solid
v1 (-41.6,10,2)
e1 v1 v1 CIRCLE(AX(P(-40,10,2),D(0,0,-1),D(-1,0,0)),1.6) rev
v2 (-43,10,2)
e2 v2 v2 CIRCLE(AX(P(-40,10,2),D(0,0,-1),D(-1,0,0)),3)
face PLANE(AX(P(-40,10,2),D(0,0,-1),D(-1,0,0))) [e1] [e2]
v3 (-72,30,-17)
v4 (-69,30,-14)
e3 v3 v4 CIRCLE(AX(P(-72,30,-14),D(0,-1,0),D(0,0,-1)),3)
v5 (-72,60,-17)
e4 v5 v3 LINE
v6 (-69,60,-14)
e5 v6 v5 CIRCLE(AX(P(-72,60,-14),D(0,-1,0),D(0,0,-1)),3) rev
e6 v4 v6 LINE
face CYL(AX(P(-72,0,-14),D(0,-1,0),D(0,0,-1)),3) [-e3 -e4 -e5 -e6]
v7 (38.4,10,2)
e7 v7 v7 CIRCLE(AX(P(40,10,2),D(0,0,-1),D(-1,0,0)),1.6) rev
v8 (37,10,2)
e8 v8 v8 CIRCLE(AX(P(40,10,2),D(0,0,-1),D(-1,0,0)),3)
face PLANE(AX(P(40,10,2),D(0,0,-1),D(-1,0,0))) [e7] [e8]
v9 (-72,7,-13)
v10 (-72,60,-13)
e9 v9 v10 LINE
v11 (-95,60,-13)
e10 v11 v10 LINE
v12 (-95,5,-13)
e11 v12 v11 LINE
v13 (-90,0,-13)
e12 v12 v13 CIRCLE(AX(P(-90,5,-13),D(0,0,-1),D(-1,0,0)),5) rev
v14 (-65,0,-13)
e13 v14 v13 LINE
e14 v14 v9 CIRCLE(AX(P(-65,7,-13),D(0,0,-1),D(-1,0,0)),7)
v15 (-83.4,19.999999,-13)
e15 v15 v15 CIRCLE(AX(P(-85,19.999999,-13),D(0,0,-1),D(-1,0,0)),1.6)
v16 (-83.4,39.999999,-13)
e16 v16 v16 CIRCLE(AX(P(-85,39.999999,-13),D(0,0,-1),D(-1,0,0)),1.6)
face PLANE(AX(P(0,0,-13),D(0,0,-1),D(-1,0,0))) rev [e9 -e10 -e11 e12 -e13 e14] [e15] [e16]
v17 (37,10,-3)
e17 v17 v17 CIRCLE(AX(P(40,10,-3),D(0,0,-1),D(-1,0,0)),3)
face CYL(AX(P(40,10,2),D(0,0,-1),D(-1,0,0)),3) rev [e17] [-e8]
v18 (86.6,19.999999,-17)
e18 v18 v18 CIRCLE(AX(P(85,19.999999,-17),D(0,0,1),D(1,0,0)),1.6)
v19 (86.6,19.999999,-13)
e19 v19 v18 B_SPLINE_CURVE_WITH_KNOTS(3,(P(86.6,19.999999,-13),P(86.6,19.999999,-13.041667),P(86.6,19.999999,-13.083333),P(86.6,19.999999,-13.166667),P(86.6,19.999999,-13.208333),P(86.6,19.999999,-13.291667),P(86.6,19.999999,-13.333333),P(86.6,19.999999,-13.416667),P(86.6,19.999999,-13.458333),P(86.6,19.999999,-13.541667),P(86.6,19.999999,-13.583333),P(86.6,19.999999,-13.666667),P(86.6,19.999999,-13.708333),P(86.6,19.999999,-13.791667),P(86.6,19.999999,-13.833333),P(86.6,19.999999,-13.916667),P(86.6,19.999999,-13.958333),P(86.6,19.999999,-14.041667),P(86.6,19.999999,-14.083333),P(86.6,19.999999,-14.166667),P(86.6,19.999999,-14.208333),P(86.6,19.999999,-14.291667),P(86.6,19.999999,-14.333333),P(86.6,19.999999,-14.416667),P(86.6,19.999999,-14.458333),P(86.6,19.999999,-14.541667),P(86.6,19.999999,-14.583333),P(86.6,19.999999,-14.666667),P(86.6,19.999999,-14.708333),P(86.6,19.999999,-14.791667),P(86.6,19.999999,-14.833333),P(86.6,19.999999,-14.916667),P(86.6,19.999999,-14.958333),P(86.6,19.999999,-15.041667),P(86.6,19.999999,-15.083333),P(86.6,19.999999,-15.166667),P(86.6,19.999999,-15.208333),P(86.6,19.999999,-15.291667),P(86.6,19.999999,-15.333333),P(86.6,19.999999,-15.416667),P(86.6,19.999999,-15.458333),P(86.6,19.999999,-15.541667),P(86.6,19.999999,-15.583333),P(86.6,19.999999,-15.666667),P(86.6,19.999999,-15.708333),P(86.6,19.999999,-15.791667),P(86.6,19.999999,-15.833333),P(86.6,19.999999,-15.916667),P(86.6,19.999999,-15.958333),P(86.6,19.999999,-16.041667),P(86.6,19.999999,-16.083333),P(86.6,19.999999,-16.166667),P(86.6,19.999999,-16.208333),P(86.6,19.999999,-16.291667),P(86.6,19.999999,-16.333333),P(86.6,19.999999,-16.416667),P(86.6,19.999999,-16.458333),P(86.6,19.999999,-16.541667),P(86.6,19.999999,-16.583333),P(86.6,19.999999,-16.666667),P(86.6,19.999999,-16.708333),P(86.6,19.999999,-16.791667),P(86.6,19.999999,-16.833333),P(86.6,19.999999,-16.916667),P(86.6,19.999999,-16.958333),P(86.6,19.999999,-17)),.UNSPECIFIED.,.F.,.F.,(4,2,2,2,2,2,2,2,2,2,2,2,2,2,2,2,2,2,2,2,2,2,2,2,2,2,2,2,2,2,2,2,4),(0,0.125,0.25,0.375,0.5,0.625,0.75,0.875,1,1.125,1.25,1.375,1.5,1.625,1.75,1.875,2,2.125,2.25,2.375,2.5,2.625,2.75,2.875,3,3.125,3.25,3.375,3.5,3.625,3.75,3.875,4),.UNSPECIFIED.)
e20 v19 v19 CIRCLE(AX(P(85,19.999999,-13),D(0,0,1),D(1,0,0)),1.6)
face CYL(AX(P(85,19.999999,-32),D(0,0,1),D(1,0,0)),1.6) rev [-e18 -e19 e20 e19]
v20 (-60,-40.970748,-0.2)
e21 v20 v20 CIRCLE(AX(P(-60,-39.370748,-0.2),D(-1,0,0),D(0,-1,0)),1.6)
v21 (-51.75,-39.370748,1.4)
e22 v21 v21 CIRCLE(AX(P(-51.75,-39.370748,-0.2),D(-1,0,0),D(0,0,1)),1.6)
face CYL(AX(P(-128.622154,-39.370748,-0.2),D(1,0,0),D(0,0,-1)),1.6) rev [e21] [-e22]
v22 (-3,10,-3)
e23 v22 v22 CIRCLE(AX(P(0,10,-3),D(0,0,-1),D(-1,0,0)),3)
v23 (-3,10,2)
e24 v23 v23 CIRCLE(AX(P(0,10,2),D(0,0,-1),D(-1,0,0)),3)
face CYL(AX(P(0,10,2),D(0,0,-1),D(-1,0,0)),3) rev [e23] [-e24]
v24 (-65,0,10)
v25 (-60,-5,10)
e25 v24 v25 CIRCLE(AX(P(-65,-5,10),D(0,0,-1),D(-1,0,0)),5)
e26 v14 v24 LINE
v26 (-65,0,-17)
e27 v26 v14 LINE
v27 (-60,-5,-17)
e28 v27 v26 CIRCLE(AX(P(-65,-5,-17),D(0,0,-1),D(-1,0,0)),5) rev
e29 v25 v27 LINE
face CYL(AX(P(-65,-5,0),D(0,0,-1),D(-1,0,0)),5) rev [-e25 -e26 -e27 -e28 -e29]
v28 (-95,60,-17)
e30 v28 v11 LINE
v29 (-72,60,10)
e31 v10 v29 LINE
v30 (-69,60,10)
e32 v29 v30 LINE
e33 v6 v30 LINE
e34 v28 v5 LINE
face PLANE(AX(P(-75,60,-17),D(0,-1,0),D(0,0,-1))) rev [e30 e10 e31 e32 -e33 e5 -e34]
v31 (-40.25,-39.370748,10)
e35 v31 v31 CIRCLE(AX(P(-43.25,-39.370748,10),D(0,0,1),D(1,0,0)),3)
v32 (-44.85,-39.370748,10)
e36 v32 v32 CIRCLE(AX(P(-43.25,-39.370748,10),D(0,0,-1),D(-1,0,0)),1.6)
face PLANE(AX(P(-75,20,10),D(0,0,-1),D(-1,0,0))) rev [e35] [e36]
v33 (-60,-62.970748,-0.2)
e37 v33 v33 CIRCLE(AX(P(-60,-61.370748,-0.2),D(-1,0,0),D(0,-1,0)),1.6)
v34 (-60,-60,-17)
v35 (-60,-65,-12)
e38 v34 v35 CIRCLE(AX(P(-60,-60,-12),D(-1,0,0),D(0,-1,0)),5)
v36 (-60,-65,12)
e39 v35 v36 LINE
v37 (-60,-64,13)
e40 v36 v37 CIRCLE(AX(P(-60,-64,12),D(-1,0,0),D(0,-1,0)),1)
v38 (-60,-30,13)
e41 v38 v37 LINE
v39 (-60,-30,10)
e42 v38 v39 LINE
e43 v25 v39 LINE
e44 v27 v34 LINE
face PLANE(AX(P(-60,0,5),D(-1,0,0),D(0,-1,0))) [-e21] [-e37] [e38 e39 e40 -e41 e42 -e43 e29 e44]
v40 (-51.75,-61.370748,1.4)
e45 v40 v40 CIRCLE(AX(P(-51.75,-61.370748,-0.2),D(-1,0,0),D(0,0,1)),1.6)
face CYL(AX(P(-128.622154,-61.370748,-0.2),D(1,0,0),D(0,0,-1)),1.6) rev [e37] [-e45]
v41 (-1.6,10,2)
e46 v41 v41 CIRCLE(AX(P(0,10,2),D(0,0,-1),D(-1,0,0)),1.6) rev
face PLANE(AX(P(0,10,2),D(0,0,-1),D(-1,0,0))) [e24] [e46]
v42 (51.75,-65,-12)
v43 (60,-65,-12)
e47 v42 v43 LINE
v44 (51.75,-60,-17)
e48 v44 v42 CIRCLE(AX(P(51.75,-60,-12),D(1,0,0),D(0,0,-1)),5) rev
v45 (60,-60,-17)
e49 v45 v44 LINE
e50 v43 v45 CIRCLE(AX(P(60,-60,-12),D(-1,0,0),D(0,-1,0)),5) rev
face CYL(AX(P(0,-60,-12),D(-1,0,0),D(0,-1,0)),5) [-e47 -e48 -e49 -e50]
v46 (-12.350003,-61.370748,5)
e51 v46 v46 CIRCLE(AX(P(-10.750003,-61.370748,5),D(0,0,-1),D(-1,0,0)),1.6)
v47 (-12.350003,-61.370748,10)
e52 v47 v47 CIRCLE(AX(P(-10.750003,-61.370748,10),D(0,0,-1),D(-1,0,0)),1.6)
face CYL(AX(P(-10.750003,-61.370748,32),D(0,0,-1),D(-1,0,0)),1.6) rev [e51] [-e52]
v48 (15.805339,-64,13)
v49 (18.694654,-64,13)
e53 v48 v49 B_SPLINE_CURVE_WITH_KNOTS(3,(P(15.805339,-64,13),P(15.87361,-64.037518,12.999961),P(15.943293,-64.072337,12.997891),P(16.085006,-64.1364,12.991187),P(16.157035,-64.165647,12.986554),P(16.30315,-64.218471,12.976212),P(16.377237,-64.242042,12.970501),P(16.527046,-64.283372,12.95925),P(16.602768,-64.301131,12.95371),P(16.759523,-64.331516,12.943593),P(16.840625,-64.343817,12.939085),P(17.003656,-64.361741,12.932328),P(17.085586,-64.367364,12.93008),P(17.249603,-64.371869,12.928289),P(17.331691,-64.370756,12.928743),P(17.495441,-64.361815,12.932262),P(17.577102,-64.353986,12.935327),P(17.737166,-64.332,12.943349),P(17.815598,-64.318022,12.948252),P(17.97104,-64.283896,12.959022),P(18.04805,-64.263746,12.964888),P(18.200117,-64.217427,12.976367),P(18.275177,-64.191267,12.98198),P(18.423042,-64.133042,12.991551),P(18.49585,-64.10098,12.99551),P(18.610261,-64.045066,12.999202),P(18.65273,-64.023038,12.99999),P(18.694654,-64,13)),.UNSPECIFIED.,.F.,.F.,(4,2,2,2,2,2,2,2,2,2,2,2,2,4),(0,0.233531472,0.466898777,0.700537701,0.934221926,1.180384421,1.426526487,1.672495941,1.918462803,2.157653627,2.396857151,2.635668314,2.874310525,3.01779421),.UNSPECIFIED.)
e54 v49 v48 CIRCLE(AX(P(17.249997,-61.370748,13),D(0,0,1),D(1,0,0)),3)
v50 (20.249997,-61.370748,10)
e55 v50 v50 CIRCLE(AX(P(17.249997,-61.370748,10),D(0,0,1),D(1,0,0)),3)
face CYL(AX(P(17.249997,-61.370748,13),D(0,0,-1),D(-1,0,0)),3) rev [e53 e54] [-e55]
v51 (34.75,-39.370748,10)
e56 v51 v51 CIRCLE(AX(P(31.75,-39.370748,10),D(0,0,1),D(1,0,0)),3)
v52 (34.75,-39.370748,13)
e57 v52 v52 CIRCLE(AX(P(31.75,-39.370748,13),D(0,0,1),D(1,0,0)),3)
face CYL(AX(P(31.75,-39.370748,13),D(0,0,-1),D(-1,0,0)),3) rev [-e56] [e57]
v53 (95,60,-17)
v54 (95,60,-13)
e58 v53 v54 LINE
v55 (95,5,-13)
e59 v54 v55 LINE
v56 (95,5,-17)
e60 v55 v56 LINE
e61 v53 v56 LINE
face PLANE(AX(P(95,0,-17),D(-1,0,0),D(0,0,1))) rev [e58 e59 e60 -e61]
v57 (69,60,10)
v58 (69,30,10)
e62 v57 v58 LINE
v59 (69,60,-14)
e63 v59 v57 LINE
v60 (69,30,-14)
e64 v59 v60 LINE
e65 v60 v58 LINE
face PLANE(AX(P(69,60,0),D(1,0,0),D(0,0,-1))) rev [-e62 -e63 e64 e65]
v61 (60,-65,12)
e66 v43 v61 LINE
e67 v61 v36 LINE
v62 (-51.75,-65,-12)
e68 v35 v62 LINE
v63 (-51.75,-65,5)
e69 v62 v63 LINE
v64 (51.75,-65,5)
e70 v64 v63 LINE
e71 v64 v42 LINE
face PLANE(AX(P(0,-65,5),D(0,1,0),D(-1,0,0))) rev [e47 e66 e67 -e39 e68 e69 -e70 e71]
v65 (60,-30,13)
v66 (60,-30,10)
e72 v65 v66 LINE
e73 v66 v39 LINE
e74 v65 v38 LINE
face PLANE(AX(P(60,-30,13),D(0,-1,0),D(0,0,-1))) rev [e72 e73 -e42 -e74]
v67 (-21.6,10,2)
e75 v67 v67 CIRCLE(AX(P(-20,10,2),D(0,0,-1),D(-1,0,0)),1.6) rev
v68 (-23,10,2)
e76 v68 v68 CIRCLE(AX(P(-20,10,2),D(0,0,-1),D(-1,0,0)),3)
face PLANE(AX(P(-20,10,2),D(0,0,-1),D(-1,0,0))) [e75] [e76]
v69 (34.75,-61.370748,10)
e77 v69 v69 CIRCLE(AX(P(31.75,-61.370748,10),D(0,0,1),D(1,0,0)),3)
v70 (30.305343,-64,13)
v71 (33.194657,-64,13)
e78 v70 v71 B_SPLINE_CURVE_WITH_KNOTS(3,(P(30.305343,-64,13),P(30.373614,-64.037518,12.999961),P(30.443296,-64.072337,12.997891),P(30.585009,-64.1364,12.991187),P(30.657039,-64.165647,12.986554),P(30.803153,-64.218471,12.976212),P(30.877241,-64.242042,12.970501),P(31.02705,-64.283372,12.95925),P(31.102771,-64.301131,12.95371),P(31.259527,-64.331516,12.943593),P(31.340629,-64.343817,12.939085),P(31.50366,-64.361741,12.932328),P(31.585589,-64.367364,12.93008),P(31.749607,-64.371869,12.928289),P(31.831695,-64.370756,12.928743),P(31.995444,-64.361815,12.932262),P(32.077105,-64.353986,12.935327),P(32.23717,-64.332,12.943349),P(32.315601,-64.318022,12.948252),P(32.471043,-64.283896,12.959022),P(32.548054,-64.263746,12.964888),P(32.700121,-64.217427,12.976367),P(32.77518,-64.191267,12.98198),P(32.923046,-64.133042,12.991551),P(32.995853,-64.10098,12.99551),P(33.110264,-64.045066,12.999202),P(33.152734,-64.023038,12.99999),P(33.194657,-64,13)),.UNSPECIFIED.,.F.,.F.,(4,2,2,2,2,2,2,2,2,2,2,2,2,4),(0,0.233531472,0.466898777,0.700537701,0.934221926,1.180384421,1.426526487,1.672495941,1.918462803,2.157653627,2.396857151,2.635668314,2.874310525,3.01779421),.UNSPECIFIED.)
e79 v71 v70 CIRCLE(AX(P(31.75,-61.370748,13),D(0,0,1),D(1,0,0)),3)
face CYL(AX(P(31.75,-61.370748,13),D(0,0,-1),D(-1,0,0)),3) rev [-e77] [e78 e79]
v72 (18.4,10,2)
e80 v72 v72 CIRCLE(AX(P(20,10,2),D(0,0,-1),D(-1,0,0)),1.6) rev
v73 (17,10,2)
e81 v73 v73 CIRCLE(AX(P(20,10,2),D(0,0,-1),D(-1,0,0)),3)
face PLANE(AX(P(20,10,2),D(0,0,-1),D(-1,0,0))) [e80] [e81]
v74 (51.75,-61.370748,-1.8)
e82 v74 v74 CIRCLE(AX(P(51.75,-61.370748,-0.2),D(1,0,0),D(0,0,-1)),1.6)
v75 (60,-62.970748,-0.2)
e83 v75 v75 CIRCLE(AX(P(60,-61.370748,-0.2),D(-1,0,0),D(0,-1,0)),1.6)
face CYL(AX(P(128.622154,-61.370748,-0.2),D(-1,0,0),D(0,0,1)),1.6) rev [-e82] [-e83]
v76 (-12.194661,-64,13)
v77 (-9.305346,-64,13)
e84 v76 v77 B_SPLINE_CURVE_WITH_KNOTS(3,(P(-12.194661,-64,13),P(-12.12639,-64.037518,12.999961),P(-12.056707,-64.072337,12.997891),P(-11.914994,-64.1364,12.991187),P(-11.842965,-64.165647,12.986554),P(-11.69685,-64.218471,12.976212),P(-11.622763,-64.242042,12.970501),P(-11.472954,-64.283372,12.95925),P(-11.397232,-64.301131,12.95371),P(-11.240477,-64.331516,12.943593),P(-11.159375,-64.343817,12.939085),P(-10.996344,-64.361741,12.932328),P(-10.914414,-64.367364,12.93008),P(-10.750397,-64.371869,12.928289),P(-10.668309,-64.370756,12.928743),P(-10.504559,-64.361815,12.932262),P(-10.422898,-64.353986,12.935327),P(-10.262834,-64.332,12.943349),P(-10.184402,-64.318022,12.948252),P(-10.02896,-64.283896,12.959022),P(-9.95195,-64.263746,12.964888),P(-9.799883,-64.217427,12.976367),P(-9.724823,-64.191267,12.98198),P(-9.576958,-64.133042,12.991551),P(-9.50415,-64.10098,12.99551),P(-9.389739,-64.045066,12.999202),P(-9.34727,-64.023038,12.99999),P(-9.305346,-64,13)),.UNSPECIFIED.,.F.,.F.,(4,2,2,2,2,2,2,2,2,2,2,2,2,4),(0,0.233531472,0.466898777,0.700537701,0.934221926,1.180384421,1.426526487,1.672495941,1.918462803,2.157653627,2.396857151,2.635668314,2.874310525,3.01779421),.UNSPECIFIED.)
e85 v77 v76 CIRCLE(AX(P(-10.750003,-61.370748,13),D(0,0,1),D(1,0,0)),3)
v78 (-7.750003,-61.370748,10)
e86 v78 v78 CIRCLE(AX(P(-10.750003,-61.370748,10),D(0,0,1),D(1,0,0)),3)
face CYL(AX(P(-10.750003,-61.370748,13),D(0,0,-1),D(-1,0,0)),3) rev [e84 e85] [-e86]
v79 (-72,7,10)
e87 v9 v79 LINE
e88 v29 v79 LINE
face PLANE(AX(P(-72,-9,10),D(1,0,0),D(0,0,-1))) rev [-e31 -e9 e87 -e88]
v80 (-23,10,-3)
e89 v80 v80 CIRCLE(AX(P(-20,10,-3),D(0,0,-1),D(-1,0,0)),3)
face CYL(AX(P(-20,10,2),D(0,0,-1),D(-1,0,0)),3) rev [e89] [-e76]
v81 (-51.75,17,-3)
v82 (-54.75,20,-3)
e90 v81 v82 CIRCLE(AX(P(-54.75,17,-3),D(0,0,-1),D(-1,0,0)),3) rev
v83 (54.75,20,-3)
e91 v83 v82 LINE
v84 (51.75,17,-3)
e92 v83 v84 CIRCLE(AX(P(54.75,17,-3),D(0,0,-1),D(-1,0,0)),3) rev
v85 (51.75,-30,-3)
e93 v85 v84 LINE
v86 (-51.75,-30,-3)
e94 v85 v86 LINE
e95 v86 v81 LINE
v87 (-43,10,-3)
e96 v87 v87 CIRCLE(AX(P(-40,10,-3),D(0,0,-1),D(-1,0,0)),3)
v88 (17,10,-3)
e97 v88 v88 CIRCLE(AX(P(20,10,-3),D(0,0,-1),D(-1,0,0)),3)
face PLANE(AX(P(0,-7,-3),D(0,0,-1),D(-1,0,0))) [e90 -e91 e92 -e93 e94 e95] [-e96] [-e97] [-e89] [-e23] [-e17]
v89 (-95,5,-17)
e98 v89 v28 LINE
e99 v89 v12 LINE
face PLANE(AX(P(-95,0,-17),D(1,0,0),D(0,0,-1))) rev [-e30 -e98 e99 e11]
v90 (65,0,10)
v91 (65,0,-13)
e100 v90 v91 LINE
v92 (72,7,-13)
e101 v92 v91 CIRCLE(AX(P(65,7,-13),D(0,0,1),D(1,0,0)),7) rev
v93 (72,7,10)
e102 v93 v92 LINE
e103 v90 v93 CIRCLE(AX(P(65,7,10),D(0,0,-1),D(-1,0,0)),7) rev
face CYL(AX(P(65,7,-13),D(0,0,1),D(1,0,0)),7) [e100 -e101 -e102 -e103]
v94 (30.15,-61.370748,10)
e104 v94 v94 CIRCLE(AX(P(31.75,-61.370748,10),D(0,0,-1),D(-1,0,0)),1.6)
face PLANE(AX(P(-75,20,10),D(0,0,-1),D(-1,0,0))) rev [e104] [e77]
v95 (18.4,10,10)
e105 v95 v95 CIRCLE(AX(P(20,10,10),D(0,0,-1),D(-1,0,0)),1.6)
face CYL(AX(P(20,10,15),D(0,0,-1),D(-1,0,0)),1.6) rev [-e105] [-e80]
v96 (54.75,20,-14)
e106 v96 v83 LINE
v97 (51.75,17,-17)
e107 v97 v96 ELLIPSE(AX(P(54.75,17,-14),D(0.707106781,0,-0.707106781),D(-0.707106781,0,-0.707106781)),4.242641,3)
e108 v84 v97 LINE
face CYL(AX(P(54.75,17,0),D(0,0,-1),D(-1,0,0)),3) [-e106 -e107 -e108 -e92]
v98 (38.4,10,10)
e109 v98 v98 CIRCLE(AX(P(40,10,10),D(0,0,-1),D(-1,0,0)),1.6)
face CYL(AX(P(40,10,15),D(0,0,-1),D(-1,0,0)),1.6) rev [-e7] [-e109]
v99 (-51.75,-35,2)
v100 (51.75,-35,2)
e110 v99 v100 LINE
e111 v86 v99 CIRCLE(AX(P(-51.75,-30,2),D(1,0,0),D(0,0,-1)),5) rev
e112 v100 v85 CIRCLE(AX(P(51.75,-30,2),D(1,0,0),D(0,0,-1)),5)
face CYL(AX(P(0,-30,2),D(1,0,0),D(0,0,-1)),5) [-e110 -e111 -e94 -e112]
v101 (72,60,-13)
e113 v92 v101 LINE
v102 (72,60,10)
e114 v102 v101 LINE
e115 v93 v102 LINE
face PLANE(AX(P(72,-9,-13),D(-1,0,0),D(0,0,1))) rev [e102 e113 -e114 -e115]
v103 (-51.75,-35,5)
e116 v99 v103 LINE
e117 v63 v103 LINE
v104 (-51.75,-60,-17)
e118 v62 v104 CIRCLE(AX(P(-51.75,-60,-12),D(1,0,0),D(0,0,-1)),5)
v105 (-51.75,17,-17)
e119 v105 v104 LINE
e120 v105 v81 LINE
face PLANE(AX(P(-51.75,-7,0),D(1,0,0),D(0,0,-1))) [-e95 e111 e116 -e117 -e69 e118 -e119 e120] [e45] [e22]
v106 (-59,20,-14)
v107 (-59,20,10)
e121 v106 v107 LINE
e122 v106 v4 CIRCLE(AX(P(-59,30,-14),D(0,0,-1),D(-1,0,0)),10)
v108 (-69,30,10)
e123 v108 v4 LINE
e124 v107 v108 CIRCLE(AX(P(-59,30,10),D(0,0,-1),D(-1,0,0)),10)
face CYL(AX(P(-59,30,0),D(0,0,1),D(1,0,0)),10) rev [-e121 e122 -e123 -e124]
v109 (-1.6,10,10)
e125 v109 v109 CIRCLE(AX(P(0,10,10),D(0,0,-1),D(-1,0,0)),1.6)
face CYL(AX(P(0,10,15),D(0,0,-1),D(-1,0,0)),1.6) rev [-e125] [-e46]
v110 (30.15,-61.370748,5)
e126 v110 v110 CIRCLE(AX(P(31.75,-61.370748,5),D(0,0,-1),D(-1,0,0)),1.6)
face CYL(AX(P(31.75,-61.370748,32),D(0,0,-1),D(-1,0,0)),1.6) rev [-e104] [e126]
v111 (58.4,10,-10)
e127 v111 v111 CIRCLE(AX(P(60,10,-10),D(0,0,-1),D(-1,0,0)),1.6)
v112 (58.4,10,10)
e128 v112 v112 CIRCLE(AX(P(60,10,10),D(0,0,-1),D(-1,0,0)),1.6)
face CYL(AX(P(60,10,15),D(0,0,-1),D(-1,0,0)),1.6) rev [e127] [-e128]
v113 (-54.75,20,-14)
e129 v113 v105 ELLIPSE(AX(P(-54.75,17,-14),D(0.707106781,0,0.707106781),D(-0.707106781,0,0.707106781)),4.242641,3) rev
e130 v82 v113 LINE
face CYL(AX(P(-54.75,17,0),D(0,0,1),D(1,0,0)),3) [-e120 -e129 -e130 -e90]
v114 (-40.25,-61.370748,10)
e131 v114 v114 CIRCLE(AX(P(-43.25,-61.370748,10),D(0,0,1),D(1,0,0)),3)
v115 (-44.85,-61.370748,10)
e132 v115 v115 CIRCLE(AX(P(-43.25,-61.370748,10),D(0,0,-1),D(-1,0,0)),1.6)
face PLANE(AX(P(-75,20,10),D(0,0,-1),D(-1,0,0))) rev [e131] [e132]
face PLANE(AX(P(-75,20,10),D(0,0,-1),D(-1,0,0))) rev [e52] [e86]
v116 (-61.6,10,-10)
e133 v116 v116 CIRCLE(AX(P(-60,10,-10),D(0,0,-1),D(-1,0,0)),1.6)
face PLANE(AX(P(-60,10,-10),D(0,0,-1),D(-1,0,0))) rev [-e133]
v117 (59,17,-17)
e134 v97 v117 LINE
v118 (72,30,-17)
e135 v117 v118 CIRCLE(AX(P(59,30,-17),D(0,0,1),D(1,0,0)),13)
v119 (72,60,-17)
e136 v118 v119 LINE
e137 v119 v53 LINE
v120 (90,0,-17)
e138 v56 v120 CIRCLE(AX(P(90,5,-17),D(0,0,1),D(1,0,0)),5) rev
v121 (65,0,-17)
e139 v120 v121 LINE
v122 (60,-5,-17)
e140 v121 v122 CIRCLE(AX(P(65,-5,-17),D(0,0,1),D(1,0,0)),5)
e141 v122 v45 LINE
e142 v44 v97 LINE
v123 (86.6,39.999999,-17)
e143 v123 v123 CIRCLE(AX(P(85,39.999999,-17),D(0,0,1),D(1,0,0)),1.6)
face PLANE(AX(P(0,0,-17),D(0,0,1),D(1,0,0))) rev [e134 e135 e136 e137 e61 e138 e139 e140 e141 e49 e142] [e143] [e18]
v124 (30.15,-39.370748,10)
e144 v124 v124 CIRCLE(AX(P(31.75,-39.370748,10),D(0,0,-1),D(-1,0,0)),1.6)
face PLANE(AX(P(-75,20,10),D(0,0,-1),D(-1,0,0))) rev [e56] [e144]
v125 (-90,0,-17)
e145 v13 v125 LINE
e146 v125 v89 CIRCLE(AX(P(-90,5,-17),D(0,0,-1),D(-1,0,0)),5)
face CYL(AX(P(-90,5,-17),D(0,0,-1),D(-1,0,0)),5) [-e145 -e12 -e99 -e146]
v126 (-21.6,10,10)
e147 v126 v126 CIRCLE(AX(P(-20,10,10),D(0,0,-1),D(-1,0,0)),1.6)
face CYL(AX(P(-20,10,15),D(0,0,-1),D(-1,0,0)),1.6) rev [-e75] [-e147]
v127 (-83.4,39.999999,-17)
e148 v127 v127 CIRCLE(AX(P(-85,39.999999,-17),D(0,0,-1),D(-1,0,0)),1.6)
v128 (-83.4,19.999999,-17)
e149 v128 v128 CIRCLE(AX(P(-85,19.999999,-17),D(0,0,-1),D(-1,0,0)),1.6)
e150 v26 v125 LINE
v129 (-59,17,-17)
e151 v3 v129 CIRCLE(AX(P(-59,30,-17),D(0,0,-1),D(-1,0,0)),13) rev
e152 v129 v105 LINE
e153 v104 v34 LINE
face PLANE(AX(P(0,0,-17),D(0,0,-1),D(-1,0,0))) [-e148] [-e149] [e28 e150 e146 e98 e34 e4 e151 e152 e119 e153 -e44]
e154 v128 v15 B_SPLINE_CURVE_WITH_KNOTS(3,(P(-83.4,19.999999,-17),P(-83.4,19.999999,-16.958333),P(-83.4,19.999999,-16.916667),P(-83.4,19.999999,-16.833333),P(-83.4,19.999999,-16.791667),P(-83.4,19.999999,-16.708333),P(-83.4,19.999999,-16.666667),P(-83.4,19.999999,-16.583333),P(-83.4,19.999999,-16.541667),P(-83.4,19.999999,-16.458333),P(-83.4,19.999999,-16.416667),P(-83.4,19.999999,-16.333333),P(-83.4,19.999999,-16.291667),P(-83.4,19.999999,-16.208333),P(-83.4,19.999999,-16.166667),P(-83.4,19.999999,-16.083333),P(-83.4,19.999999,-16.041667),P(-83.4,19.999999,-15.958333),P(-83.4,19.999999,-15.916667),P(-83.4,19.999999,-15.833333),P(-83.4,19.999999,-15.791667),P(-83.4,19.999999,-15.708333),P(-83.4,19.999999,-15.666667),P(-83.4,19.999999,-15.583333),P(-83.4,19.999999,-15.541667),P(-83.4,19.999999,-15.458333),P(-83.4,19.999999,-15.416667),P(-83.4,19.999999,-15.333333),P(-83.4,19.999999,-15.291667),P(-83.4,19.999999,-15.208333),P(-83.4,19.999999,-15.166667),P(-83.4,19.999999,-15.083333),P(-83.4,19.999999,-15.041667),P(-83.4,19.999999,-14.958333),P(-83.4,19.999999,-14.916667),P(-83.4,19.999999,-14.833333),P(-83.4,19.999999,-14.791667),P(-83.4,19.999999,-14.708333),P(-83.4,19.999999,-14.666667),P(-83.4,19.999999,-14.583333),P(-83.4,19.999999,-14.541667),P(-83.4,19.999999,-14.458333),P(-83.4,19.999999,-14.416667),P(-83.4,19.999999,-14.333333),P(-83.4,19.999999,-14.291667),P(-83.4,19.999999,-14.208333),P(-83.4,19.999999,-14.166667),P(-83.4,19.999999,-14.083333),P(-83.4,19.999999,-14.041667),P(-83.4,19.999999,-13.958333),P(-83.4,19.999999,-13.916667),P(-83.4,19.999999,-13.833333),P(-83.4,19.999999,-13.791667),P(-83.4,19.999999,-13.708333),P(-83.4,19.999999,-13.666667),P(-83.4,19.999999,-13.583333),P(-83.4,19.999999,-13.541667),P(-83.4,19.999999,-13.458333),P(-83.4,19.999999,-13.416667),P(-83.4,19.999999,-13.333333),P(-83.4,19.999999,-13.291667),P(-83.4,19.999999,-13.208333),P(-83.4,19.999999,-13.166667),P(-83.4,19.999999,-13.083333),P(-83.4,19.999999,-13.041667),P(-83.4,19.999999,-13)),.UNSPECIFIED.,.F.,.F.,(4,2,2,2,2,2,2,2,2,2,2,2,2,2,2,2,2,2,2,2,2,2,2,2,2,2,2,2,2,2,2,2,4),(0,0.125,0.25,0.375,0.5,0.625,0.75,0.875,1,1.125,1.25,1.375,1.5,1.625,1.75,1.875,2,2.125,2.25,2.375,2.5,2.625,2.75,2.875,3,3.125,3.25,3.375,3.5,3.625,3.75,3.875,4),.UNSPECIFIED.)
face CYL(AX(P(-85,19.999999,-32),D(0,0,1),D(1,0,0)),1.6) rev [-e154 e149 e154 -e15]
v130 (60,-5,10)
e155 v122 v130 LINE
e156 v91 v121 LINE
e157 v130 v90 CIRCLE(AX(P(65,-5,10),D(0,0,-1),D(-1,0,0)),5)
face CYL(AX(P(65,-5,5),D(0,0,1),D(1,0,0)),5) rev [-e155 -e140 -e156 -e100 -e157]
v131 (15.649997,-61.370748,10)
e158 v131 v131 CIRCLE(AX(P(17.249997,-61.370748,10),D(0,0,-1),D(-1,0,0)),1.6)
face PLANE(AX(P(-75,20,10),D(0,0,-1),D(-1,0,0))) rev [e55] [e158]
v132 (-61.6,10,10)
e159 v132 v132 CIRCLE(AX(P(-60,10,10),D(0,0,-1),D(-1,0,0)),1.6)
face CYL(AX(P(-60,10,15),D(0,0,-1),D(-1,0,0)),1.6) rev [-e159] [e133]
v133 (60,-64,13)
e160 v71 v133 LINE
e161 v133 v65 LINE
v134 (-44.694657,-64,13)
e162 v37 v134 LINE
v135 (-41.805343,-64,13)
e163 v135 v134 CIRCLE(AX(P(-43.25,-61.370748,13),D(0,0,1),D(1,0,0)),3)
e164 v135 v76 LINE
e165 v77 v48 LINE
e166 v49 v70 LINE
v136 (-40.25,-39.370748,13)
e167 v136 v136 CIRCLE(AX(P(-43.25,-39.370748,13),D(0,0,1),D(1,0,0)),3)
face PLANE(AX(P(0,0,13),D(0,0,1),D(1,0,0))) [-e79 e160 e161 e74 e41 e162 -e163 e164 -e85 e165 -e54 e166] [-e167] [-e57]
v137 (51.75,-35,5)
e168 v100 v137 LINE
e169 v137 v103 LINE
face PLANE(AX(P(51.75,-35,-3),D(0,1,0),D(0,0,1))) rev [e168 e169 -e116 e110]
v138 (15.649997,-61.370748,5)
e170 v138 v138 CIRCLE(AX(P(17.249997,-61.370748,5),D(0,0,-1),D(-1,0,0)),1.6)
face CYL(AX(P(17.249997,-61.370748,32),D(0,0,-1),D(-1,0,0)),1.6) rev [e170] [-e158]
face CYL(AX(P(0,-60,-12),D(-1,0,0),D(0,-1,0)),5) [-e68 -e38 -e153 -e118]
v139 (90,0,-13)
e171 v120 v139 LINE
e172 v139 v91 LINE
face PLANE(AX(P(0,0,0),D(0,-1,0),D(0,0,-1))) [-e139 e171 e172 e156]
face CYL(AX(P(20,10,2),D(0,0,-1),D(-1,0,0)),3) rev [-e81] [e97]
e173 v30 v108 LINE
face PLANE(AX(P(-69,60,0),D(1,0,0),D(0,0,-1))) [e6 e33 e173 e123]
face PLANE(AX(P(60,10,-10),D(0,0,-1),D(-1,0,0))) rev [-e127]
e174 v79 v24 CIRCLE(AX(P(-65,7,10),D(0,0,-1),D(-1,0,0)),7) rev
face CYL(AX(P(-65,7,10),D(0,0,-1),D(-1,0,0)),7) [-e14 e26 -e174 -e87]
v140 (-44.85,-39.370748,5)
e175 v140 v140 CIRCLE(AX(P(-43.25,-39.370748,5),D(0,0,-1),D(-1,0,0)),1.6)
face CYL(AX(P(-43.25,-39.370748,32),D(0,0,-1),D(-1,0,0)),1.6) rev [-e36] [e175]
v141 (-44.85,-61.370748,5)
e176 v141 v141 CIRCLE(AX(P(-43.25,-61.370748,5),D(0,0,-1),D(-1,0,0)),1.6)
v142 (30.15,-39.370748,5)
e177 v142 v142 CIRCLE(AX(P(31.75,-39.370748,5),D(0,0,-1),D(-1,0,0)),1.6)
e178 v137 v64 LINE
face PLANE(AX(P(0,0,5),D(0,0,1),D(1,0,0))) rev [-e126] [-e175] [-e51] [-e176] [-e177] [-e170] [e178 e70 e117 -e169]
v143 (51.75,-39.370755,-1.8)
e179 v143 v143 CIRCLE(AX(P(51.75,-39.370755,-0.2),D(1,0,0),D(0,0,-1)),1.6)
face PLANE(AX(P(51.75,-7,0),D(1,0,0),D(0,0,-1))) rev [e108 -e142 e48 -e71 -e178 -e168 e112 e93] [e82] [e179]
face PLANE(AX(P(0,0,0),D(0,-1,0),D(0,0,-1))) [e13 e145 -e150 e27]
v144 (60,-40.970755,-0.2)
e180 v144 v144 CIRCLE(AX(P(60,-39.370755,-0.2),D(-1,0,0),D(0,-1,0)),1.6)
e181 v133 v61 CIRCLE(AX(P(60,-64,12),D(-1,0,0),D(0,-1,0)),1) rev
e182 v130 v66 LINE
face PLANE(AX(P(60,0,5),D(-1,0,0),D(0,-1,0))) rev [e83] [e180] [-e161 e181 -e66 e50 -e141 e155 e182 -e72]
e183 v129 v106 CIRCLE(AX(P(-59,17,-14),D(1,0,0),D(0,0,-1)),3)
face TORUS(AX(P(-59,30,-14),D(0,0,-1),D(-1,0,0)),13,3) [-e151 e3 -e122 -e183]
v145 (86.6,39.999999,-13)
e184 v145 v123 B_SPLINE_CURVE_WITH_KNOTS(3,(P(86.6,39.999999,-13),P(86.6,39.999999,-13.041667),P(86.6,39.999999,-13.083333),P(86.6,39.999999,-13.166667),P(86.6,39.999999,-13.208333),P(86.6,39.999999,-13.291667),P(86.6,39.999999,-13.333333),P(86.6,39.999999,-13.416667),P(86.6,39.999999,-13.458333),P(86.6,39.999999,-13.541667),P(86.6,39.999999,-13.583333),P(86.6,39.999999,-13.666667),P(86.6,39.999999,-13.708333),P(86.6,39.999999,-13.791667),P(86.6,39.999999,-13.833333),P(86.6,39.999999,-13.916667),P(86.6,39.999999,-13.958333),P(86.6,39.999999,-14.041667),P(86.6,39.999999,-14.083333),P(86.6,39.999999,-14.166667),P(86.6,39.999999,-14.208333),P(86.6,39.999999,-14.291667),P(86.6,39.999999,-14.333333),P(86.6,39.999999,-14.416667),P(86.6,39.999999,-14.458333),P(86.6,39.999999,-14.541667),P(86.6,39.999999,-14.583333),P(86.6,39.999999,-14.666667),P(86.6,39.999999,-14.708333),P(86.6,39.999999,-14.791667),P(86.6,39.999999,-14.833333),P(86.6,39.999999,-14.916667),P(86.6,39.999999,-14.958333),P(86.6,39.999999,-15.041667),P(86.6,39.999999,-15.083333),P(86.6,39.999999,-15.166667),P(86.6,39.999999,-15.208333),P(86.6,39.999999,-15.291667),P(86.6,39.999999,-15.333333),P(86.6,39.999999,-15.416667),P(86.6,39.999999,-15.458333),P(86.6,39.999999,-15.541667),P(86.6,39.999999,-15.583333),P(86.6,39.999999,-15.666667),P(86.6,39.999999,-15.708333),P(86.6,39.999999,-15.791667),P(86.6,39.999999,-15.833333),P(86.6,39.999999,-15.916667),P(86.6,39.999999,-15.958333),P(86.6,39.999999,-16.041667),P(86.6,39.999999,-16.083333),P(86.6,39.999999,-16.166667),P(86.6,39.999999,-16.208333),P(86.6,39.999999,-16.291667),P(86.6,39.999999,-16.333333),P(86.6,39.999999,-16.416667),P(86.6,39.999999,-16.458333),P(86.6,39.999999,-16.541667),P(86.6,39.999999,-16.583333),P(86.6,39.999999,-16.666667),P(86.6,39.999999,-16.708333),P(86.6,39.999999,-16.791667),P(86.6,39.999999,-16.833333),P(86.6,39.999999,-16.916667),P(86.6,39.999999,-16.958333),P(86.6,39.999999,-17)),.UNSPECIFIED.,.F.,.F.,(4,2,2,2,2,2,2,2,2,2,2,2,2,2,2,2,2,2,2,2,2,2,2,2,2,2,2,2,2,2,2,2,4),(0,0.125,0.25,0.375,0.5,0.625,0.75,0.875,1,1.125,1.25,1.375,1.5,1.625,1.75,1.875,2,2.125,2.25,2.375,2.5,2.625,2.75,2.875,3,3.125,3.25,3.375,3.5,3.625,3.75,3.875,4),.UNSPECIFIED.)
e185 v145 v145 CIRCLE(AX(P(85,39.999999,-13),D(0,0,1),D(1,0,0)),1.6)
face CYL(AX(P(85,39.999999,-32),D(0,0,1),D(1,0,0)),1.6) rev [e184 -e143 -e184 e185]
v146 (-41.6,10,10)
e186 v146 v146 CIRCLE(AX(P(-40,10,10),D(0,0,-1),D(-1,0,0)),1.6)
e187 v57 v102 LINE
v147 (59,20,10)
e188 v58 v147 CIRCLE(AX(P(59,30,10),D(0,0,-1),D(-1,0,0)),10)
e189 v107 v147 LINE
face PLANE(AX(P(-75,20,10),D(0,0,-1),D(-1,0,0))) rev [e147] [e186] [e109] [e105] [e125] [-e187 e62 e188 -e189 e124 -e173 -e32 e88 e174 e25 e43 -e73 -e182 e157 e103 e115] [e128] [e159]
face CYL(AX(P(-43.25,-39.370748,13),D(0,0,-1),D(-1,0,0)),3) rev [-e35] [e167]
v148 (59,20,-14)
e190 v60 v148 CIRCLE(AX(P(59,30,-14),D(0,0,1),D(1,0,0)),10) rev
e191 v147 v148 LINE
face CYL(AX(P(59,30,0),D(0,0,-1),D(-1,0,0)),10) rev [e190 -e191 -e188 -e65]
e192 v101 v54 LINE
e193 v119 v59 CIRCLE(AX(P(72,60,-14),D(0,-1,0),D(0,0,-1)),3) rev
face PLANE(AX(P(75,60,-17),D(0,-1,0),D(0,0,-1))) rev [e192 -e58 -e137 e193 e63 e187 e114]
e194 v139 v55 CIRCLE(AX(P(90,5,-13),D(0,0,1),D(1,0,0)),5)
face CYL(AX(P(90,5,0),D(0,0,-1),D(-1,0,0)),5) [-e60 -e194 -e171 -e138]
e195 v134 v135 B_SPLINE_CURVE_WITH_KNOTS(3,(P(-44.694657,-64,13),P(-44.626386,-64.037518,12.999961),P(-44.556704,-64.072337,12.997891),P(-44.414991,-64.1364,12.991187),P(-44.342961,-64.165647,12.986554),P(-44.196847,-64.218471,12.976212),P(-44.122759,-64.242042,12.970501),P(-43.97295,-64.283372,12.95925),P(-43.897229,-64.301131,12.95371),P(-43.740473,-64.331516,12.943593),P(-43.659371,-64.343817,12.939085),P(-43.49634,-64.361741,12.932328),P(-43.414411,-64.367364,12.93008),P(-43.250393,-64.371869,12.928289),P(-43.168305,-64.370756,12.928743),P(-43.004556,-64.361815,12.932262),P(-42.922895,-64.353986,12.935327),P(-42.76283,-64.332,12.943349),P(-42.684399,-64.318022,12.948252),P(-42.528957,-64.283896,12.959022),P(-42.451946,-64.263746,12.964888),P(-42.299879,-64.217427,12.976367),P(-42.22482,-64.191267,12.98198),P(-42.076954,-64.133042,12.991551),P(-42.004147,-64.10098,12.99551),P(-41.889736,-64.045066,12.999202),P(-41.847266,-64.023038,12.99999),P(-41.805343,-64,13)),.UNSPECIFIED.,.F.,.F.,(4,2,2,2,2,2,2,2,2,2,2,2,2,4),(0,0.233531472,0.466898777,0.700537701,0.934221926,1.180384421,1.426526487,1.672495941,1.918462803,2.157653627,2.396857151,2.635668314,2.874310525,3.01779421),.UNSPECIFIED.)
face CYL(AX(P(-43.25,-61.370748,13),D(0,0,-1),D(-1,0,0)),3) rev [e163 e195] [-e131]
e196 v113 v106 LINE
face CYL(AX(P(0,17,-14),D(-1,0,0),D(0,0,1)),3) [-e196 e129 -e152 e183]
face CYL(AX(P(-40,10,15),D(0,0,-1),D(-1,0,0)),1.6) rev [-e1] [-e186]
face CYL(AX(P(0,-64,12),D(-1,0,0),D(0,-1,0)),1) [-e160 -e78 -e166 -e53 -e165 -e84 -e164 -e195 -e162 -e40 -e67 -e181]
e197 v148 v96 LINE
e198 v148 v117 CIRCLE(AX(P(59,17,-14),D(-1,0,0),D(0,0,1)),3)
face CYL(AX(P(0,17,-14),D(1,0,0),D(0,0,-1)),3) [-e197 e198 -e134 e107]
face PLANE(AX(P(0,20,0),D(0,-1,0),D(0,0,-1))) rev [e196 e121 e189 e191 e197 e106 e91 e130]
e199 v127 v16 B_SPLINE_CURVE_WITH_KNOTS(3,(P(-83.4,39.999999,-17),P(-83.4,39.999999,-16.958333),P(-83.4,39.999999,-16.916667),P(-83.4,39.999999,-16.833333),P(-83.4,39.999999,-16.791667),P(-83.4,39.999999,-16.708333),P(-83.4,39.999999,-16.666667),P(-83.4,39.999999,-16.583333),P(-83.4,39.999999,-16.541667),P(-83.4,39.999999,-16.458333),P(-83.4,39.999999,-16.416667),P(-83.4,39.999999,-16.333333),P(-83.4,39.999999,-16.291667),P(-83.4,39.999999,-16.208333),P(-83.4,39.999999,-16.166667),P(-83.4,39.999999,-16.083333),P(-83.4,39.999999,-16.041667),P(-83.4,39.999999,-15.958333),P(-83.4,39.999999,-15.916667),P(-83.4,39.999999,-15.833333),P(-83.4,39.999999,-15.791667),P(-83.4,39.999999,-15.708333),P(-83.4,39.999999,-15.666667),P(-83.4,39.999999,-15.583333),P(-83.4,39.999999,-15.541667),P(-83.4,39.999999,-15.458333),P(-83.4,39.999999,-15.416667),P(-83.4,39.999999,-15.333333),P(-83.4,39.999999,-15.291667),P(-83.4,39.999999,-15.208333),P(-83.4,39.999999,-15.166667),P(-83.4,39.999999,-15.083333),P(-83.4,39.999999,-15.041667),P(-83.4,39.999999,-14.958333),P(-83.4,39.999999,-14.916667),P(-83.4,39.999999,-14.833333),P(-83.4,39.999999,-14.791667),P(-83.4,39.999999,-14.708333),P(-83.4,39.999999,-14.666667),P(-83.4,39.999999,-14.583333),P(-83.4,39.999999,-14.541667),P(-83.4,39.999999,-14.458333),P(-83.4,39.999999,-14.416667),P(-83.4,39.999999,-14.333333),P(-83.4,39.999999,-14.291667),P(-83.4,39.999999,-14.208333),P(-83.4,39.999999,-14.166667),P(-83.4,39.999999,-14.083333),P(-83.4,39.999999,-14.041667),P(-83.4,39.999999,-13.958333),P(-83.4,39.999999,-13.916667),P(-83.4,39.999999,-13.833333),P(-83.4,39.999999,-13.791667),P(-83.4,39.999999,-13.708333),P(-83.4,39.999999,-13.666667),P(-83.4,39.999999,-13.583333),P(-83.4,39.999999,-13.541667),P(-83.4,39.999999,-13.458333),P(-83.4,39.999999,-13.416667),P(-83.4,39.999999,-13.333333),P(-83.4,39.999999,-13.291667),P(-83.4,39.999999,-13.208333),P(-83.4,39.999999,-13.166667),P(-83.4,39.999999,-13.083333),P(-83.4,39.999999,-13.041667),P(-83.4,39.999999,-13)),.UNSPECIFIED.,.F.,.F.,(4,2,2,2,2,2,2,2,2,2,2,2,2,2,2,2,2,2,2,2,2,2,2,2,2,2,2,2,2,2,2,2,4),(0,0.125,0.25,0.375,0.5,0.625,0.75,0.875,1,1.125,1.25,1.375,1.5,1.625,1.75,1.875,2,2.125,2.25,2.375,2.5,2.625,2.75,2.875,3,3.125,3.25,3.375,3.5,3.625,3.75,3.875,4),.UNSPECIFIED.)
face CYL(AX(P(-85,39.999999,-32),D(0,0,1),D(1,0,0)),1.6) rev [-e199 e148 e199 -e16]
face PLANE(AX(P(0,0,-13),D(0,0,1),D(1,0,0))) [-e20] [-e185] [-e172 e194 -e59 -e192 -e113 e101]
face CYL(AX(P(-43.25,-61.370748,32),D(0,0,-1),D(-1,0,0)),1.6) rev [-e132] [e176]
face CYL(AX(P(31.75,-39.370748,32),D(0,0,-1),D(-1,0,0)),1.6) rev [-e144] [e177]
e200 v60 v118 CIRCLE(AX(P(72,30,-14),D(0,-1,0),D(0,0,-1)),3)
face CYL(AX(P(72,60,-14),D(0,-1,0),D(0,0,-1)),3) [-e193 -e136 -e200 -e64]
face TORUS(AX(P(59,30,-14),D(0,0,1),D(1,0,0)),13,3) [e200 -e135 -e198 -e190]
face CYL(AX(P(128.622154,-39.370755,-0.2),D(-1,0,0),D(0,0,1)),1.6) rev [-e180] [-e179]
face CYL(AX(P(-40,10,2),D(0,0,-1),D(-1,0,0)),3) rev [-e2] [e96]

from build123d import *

# Parameters (mm, degrees)
SKETCH_1_W                  = 150
SKETCH_1_H                  = 20
EXTRUDE_1_DEPTH             = 20
SKETCH_2_W                  = 60
SKETCH_2_H                  = 65
EXTRUDE_2_DEPTH             = 5
SKETCH_3_R                  = 1.6
CUT_EXTRUDE_1_DEPTH         = 25
SKETCH_4_W                  = 51.75
SKETCH_4_H                  = 7
CUT_EXTRUDE_2_DEPTH         = 27
SKETCH_5_R                  = 1.6
CUT_EXTRUDE_3_DEPTH         = 27
SKETCH_6_W                  = 103.5
SKETCH_6_H                  = 35
EXTRUDE_3_DEPTH             = 8
SKETCH_7_W                  = 120
SKETCH_7_H                  = 35
SKETCH_7_R                  = 3
EXTRUDE_4_DEPTH             = 3
SKETCH_8_W                  = 23.25
SKETCH_8_H                  = 20
EXTRUDE_5_DEPTH             = 3
PATTERN_LINEAR_1_COUNT      = 5
PATTERN_LINEAR_1_PITCH      = 20
PATTERN_LINEAR_1_COUNT_DIR2 = 6
PATTERN_LINEAR_1_PITCH_DIR2 = 20
EXTRUDE_6_DEPTH             = 4
SKETCH_10_W                 = 3
SKETCH_10_H                 = 23
CUT_EXTRUDE_4_DEPTH         = 29
EXTRUDE_7_DEPTH             = 40
FILLET_1_R                  = 10
FILLET_2_R                  = 3
SKETCH_16_W                 = 22
SKETCH_16_H                 = 65
SKETCH_16_R                 = 1.6
EXTRUDE_9_DEPTH             = 8.25
EXTRUDE_START               = 8.25
SKETCH_17_W                 = 22
SKETCH_17_H                 = 65
SKETCH_17_R                 = 1.6
EXTRUDE_10_DEPTH            = 8.25
FILLET_4_R                  = 5
FILLET_5_R                  = 5
FILLET_6_R                  = 1
SKETCH_18_R                 = 3
CUT_EXTRUDE_6_DEPTH         = 5
FILLET_7_R                  = 5
FILLET_8_R                  = 7
SKETCH_19_R                 = 1.6
CUT_EXTRUDE_7_DEPTH         = 45


# Some blends are built 0.0001 mm under size
with BuildPart() as part:
    # 草图1 → 凸台-拉伸1 (new body)
    with BuildSketch(Plane(origin=(0, 0, 0), x_dir=(1, 0, 0), z_dir=(0, 1, 0))):
        Rectangle(SKETCH_1_W, SKETCH_1_H)
    extrude(amount=EXTRUDE_1_DEPTH)

    # 草图2 → 凸台-拉伸2 (add)
    with BuildSketch(Plane.XY.offset(10)):
        with Locations((-30, -32.5)):
            Rectangle(SKETCH_2_W, SKETCH_2_H)
        with Locations((30, -32.5)):
            Rectangle(SKETCH_2_W, SKETCH_2_H)
    extrude(amount=-EXTRUDE_2_DEPTH)

    # 草图3 → 切除-拉伸1 (cut)
    with BuildSketch(Plane(origin=(0, 0, -10), x_dir=(-1, 0, 0), z_dir=(0, 0, -1))):
        with Locations((0, 10)):
            Circle(SKETCH_3_R)
    cut_extrude_1 = extrude(amount=-CUT_EXTRUDE_1_DEPTH, mode=Mode.SUBTRACT)

    # 草图4 → 切除-拉伸2 (cut)
    with BuildSketch(Plane(origin=(0, 20, 0), x_dir=(1, 0, 0), z_dir=(0, 1, 0))):
        with Locations((-25.875, 6.5)):
            Rectangle(SKETCH_4_W, SKETCH_4_H)
        with Locations((25.875, 6.5)):
            Rectangle(SKETCH_4_W, SKETCH_4_H)
    extrude(amount=-CUT_EXTRUDE_2_DEPTH, mode=Mode.SUBTRACT)

    # 草图5 → 切除-拉伸3 (cut)
    with BuildSketch(Plane(origin=(0, 0, 5), x_dir=(-1, 0, 0), z_dir=(0, 0, -1))):
        with Locations((43.25, -61.370748044)):
            Circle(SKETCH_5_R)
        with Locations((43.25, -39.370748224)):
            Circle(SKETCH_5_R)
        with Locations((10.750003407, -61.370748044)):
            Circle(SKETCH_5_R)
        with Locations((-17.249996593, -61.370748044)):
            Circle(SKETCH_5_R)
        with Locations((-31.749999997, -61.370748044)):
            Circle(SKETCH_5_R)
        with Locations((-31.749999997, -39.370748224)):
            Circle(SKETCH_5_R)
    extrude(amount=-CUT_EXTRUDE_3_DEPTH, mode=Mode.SUBTRACT)

    # 草图6 → 凸台-拉伸3 (add)
    with BuildSketch(Plane(origin=(0, 0, 5), x_dir=(-1, 0, 0), z_dir=(0, 0, -1))):
        with Locations((0, -17.5)):
            Rectangle(SKETCH_6_W, SKETCH_6_H)
    extrude(amount=EXTRUDE_3_DEPTH)

    # 草图7 → 凸台-拉伸4 (add)
    with BuildSketch(Plane.XY.offset(10)):
        with Locations((0, -47.5)):
            Rectangle(SKETCH_7_W, SKETCH_7_H)
        with Locations((31.749999997, -39.370748224)):
            Circle(SKETCH_7_R, mode=Mode.SUBTRACT)
        with Locations((31.749999997, -61.370748044)):
            Circle(SKETCH_7_R, mode=Mode.SUBTRACT)
        with Locations((17.249996593, -61.370748044)):
            Circle(SKETCH_7_R, mode=Mode.SUBTRACT)
        with Locations((-10.750003407, -61.370748044)):
            Circle(SKETCH_7_R, mode=Mode.SUBTRACT)
        with Locations((-43.25, -39.370748224)):
            Circle(SKETCH_7_R, mode=Mode.SUBTRACT)
        with Locations((-43.25, -61.370748044)):
            Circle(SKETCH_7_R, mode=Mode.SUBTRACT)
    extrude(amount=EXTRUDE_4_DEPTH)

    # 草图8 → 凸台-拉伸5 (add)
    with BuildSketch(Plane(origin=(0, 0, -10), x_dir=(-1, 0, 0), z_dir=(0, 0, -1))):
        with Locations((63.375, 10)):
            Rectangle(SKETCH_8_W, SKETCH_8_H)
        with Locations((-63.375, 10)):
            Rectangle(SKETCH_8_W, SKETCH_8_H)
    extrude(amount=EXTRUDE_5_DEPTH)

    # 阵列(线性)1: Cut-Extrude 1 5 × 6
    with Locations(*[Vector(1, 0, 0) * (i * PATTERN_LINEAR_1_PITCH) + Vector(-1, 0, 0) * (j * PATTERN_LINEAR_1_PITCH_DIR2) for i in range(PATTERN_LINEAR_1_COUNT) for j in range(PATTERN_LINEAR_1_COUNT_DIR2) if (i, j) != (0, 0)]):
        add(cut_extrude_1, mode=Mode.SUBTRACT)

    # 草图9 → 凸台-拉伸6 (add)
    with BuildSketch(Plane(origin=(0, 0, -13), x_dir=(-1, 0, 0), z_dir=(0, 0, -1))):
        Polygon((-75, 0), (-95, 0), (-95, 60), (-75, 60), (-75, 20), (-51.75, 20), (-51.75, 0), align=None)
        Polygon((75, 0), (95, 0), (95, 60), (75, 60), (75, 20), (51.75, 20), (51.75, 0), align=None)
    extrude(amount=EXTRUDE_6_DEPTH)

    # 草图10 → 切除-拉伸4 (cut)
    with BuildSketch(Plane(origin=(0, 20, 0), x_dir=(1, 0, 0), z_dir=(0, 1, 0))):
        with Locations((-73.5, 1.5)):
            Rectangle(SKETCH_10_W, SKETCH_10_H)
        with Locations((73.5, 1.5)):
            Rectangle(SKETCH_10_W, SKETCH_10_H)
    extrude(amount=-CUT_EXTRUDE_4_DEPTH, mode=Mode.SUBTRACT)

    # 草图11 → 凸台-拉伸7 (add)
    with BuildSketch(Plane(origin=(0, 20, 0), x_dir=(1, 0, 0), z_dir=(0, 1, 0))):
        Polygon((-69, 17), (-75, 17), (-75, 13), (-72, 13), (-72, -10), (-69, -10), align=None)
        Polygon((69, 17), (69, -10), (72, -10), (72, 13), (75, 13), (75, 17), align=None)
    extrude(amount=EXTRUDE_7_DEPTH)

    # 圆角1
    fillet_1_edges = [part.edges().sort_by_distance(p)[0] for p in [
        (-69, 20, -3.5),
        (69, 20, -3.5),
    ]]
    fillet(fillet_1_edges, radius=FILLET_1_R)

    # 圆角2
    fillet_2_edges = [part.edges().sort_by_distance(p)[0] for p in [
        (55.375, 20, -17),
        (-69, 45, -17),
        (69, 45, -17),
        (-55.375, 20, -17),
        (66.071067812, 22.928932188, -17),
        (-66.071067812, 22.928932188, -17),
        (-51.75, 20, -10),
        (51.75, 20, -10),
    ]]
    fillet(fillet_2_edges, radius=FILLET_2_R)

    # 草图16 → 凸台-拉伸9 (add)
    with BuildSketch(Plane(origin=(51.75, 0, 0), x_dir=(0, 0, -1), z_dir=(1, 0, 0))):
        with Locations((6, -32.5)):
            Rectangle(SKETCH_16_W, SKETCH_16_H)
        with Locations(Location((0.2, -39.370754998, 0), (0, 0, 270))):
            Circle(SKETCH_16_R, mode=Mode.SUBTRACT)
        with Locations(Location((0.2, -61.370748044, 0), (0, 0, 270))):
            Circle(SKETCH_16_R, mode=Mode.SUBTRACT)
    extrude(amount=EXTRUDE_9_DEPTH)

    # 草图17 → 凸台-拉伸10 (add)
    with BuildSketch(Plane.ZY.offset(51.75).offset(EXTRUDE_START)):
        with Locations((-6, -32.5)):
            Rectangle(SKETCH_17_W, SKETCH_17_H)
        with Locations(Location((-0.2, -61.370748044, 0), (0, 0, 270))):
            Circle(SKETCH_17_R, mode=Mode.SUBTRACT)
        with Locations(Location((-0.2, -39.370748224, 0), (0, 0, 270))):
            Circle(SKETCH_17_R, mode=Mode.SUBTRACT)
    extrude(amount=-EXTRUDE_10_DEPTH)

    # 圆角4
    fillet_4_edges = [part.edges().sort_by_distance(p)[0] for p in [
        (-60, 0, -3.5),
        (60, 0, -3.5),
        (95, 0, -15),
        (-95, 0, -15),
    ]]
    fillet(fillet_4_edges, radius=FILLET_4_R)

    # 圆角5
    fillet_5_edges = [part.edges().sort_by_distance(p)[0] for p in [
        (55.875, -65, -17),
        (-55.875, -65, -17),
    ]]
    fillet(fillet_5_edges, radius=FILLET_5_R)

    # 圆角6
    # the kernel refuses this fillet: 1 mm, written as the material it takes off along each edge
    with BuildSketch(Plane(origin=(62.5, -65, 13), x_dir=(0, 0, -1), z_dir=(-1, 0, 0))) as fillet_6_piece_1:
        with BuildLine():
            CenterArc((FILLET_6_R, -FILLET_6_R), FILLET_6_R, 90, 90)
            Line((0, -FILLET_6_R), (0, 0))
            Line((0, 0), (FILLET_6_R, 0))
        make_face()
    extrude(amount=125, mode=Mode.SUBTRACT)

    # 草图18 → 切除-拉伸6 (cut)
    with BuildSketch(Plane(origin=(0, 0, -3), x_dir=(-1, 0, 0), z_dir=(0, 0, -1))):
        with Locations((0, 10)):
            Circle(SKETCH_18_R)
        with Locations((20, 10)):
            Circle(SKETCH_18_R)
        with Locations((40, 10)):
            Circle(SKETCH_18_R)
        with Locations((-20, 10)):
            Circle(SKETCH_18_R)
        with Locations((-40, 10)):
            Circle(SKETCH_18_R)
    extrude(amount=-CUT_EXTRUDE_6_DEPTH, mode=Mode.SUBTRACT)

    # 圆角7
    fillet_7_edges = [part.edges().sort_by_distance(p)[0] for p in [
        (0, -35, -3),
    ]]
    fillet(fillet_7_edges, radius=FILLET_7_R)

    # 圆角8
    fillet_8_edges = [part.edges().sort_by_distance(p)[0] for p in [
        (-72, 0, -1.5),
        (72, 0, -1.5),
    ]]
    fillet(fillet_8_edges, radius=FILLET_8_R - 0.0001)  # a hair under: the kernel refuses the full size

    # 草图19 → 切除-拉伸7 (cut)
    with BuildSketch(Plane.XY.offset(13)):
        with Locations((85, 39.999999445)):
            Circle(SKETCH_19_R)
        with Locations((85, 19.999999445)):
            Circle(SKETCH_19_R)
        with Locations((-85, 19.999999445)):
            Circle(SKETCH_19_R)
        with Locations((-85, 39.999999445)):
            Circle(SKETCH_19_R)
    extrude(amount=-CUT_EXTRUDE_7_DEPTH, mode=Mode.SUBTRACT)


solid = part.part
